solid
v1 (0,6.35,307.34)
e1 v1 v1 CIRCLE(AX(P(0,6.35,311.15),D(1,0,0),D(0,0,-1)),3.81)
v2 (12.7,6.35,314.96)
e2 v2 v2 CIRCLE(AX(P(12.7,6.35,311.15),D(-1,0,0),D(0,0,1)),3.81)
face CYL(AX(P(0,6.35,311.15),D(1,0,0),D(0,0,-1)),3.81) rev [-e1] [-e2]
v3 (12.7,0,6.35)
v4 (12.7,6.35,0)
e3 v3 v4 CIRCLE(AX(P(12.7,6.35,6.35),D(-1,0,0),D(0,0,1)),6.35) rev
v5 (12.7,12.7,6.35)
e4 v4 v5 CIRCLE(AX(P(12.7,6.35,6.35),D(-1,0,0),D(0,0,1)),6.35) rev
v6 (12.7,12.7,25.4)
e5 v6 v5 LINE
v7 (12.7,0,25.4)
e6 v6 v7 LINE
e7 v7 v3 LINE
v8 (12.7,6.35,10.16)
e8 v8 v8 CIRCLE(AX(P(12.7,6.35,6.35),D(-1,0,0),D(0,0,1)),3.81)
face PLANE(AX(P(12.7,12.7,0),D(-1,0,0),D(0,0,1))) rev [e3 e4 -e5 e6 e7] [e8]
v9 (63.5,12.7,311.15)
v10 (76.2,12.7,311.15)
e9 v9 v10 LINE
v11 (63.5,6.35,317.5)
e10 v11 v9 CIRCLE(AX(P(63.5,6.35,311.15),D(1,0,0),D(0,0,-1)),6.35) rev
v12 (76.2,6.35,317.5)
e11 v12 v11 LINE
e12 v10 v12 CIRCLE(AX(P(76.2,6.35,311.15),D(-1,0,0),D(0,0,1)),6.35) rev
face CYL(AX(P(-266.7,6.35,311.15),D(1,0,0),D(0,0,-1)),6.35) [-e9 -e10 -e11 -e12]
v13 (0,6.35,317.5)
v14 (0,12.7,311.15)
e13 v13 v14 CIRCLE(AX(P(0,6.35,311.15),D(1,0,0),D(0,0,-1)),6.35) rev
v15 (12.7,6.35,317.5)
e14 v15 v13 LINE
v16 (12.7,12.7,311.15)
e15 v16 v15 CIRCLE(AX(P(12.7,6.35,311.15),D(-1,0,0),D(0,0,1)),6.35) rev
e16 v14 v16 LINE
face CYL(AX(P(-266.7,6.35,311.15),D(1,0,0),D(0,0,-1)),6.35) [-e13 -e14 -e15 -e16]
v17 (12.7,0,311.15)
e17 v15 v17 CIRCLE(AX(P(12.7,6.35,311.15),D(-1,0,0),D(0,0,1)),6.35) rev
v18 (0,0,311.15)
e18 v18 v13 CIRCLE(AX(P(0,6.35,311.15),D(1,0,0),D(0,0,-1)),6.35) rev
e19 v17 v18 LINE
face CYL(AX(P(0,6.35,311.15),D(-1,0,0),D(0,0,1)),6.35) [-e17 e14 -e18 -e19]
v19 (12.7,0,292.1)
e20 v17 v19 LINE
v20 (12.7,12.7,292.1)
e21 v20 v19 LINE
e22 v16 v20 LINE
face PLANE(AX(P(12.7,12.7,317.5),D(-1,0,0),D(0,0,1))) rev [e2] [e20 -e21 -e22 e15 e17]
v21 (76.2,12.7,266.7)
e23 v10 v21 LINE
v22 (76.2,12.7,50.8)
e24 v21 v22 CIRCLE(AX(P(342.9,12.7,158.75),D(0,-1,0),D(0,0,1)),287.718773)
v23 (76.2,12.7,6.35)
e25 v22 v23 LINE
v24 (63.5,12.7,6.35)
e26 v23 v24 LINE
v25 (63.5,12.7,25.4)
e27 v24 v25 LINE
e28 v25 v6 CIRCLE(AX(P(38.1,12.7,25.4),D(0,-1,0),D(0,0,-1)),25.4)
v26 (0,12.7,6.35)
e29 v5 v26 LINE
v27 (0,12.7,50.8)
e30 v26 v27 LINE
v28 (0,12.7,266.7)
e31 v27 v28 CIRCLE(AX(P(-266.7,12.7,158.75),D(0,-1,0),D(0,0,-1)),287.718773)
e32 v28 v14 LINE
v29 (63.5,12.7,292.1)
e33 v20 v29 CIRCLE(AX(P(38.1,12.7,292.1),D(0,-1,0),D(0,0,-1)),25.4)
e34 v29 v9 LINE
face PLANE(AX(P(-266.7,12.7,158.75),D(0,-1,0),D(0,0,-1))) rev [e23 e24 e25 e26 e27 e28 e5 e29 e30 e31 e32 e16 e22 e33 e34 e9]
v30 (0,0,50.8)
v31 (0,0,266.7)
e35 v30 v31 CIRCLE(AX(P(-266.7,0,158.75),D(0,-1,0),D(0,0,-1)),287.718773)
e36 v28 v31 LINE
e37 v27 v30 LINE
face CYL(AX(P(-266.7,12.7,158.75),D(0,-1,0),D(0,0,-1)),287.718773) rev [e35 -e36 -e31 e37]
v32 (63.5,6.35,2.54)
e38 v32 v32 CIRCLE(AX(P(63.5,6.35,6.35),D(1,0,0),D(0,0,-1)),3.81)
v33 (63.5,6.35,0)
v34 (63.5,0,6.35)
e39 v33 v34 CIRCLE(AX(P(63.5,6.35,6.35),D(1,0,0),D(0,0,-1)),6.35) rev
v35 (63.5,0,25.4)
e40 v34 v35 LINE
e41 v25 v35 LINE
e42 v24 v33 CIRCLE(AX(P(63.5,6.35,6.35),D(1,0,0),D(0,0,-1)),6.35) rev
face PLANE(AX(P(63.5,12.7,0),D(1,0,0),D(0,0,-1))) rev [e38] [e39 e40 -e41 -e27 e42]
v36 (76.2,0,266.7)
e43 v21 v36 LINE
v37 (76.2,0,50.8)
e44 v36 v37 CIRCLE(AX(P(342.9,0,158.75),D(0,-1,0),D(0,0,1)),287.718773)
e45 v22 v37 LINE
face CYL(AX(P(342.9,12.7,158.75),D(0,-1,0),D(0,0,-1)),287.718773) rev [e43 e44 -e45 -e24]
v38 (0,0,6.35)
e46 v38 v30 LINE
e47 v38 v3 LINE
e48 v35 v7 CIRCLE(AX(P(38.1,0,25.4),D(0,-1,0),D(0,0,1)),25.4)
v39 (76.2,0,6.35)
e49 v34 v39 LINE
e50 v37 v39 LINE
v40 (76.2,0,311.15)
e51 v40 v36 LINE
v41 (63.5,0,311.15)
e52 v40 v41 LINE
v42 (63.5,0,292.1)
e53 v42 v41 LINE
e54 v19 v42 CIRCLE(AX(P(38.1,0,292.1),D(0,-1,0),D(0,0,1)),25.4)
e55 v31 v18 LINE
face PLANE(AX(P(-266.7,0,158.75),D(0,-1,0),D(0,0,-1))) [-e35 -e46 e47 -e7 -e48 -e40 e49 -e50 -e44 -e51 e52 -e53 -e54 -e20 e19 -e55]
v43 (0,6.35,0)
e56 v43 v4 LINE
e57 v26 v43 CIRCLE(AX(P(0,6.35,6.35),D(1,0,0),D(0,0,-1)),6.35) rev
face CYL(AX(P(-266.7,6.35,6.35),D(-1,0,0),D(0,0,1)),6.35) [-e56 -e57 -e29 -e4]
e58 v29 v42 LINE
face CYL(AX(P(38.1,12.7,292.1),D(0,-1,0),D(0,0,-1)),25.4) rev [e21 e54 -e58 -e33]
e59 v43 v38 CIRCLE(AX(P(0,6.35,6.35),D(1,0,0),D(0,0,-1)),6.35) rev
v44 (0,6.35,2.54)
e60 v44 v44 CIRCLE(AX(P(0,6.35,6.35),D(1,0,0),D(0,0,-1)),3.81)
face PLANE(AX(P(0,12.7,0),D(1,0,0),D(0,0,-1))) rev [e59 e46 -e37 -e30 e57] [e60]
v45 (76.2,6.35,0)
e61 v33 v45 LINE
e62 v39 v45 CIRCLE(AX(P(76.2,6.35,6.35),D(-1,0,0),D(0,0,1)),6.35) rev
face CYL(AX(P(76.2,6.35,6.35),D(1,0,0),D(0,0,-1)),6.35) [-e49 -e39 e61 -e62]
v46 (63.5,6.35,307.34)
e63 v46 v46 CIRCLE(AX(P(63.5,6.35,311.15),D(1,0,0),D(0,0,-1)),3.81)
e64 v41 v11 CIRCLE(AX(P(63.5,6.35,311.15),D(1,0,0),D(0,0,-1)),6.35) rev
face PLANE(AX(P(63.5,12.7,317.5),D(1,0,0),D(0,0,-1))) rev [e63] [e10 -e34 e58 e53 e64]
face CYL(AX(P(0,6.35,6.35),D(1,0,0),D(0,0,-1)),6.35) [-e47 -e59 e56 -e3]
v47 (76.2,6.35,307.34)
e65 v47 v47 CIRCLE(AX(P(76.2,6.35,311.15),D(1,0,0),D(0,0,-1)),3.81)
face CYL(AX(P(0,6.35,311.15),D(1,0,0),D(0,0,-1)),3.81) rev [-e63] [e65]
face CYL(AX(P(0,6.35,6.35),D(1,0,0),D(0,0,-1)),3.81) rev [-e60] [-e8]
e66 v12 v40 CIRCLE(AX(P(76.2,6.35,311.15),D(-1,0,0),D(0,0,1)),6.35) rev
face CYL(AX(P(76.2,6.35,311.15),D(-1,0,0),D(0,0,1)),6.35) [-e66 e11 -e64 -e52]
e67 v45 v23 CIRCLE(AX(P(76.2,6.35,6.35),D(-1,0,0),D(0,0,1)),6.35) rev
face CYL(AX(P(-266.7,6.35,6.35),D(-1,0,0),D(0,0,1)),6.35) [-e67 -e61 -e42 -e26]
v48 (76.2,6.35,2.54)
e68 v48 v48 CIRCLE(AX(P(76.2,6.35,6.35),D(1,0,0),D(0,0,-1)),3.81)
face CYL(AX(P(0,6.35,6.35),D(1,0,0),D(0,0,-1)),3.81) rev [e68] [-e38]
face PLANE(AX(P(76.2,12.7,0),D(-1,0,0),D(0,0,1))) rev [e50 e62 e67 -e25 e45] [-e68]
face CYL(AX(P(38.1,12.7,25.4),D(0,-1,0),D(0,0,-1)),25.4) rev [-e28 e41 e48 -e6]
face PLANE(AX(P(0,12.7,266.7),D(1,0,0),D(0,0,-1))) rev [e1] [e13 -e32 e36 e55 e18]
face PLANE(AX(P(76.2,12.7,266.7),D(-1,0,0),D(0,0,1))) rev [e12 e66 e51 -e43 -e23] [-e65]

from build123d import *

# Parameters (mm, degrees)
BOSS_EXTRUDE1_DEPTH = 12.7
FILLET1_R           = 6.35
SKETCH2_R           = 3.81
CUT_EXTRUDE1_DEPTH  = 327.762880389
SKETCH3_R           = 3.81
CUT_EXTRUDE2_DEPTH  = 327.762880389


with BuildPart() as part:
    # Sketch1 → Boss-Extrude1 (new body)
    with BuildSketch(Plane(origin=(0, 0, 0), x_dir=(1, 0, 0), z_dir=(0, 1, 0))):
        with BuildLine():
            Line((0, 0), (12.7, 0))
            Line((12.7, 0), (12.7, -25.4))
            ThreePointArc((12.7, -25.4), (20.139487758, -43.360512242), (38.1, -50.8))
            ThreePointArc((38.1, -50.8), (56.060512242, -43.360512242), (63.5, -25.4))
            Line((63.5, -25.4), (63.5, 0))
            Line((63.5, 0), (76.2, 0))
            Line((76.2, 0), (76.2, -50.8))
            ThreePointArc((76.2, -50.8), (55.181226716, -158.75), (76.2, -266.7))
            Line((76.2, -266.7), (76.2, -317.5))
            Line((76.2, -317.5), (63.5, -317.5))
            Line((63.5, -317.5), (63.5, -292.1))
            ThreePointArc((63.5, -292.1), (56.060512242, -274.139487758), (38.1, -266.7))
            ThreePointArc((38.1, -266.7), (20.139487758, -274.139487758), (12.7, -292.1))
            Line((12.7, -292.1), (12.7, -317.5))
            Line((12.7, -317.5), (0, -317.5))
            Line((0, -317.5), (0, -266.7))
            ThreePointArc((0, -266.7), (21.018773284, -158.75), (0, -50.8))
            Line((0, -50.8), (0, 0))
        make_face()
    extrude(amount=BOSS_EXTRUDE1_DEPTH)

    # Fillet1
    fillet1_edges = [part.edges().sort_by_distance(p)[0] for p in [
        (69.85, 0, 0),
        (6.35, 0, 0),
        (69.85, 12.7, 0),
        (6.35, 12.7, 0),
        (6.35, 0, 317.5),
        (6.35, 12.7, 317.5),
        (69.85, 0, 317.5),
        (69.85, 12.7, 317.5),
    ]]
    fillet(fillet1_edges, radius=FILLET1_R - 0.0001)  # a hair under: the kernel refuses the full size

    # Sketch2 → Cut-Extrude1 (cut, through all)
    with BuildSketch(Plane(origin=(76.2, 0, 0), x_dir=(0, 0, -1), z_dir=(1, 0, 0))):
        with Locations((-311.15, 6.35)):
            Circle(SKETCH2_R)
    extrude(amount=-CUT_EXTRUDE1_DEPTH, mode=Mode.SUBTRACT)

    # Sketch3 → Cut-Extrude2 (cut, through all)
    with BuildSketch(Plane(origin=(76.2, 0, 0), x_dir=(0, 0, -1), z_dir=(1, 0, 0))):
        with Locations((-6.35, 6.35)):
            Circle(SKETCH3_R)
    extrude(amount=-CUT_EXTRUDE2_DEPTH, mode=Mode.SUBTRACT)


solid = part.part
